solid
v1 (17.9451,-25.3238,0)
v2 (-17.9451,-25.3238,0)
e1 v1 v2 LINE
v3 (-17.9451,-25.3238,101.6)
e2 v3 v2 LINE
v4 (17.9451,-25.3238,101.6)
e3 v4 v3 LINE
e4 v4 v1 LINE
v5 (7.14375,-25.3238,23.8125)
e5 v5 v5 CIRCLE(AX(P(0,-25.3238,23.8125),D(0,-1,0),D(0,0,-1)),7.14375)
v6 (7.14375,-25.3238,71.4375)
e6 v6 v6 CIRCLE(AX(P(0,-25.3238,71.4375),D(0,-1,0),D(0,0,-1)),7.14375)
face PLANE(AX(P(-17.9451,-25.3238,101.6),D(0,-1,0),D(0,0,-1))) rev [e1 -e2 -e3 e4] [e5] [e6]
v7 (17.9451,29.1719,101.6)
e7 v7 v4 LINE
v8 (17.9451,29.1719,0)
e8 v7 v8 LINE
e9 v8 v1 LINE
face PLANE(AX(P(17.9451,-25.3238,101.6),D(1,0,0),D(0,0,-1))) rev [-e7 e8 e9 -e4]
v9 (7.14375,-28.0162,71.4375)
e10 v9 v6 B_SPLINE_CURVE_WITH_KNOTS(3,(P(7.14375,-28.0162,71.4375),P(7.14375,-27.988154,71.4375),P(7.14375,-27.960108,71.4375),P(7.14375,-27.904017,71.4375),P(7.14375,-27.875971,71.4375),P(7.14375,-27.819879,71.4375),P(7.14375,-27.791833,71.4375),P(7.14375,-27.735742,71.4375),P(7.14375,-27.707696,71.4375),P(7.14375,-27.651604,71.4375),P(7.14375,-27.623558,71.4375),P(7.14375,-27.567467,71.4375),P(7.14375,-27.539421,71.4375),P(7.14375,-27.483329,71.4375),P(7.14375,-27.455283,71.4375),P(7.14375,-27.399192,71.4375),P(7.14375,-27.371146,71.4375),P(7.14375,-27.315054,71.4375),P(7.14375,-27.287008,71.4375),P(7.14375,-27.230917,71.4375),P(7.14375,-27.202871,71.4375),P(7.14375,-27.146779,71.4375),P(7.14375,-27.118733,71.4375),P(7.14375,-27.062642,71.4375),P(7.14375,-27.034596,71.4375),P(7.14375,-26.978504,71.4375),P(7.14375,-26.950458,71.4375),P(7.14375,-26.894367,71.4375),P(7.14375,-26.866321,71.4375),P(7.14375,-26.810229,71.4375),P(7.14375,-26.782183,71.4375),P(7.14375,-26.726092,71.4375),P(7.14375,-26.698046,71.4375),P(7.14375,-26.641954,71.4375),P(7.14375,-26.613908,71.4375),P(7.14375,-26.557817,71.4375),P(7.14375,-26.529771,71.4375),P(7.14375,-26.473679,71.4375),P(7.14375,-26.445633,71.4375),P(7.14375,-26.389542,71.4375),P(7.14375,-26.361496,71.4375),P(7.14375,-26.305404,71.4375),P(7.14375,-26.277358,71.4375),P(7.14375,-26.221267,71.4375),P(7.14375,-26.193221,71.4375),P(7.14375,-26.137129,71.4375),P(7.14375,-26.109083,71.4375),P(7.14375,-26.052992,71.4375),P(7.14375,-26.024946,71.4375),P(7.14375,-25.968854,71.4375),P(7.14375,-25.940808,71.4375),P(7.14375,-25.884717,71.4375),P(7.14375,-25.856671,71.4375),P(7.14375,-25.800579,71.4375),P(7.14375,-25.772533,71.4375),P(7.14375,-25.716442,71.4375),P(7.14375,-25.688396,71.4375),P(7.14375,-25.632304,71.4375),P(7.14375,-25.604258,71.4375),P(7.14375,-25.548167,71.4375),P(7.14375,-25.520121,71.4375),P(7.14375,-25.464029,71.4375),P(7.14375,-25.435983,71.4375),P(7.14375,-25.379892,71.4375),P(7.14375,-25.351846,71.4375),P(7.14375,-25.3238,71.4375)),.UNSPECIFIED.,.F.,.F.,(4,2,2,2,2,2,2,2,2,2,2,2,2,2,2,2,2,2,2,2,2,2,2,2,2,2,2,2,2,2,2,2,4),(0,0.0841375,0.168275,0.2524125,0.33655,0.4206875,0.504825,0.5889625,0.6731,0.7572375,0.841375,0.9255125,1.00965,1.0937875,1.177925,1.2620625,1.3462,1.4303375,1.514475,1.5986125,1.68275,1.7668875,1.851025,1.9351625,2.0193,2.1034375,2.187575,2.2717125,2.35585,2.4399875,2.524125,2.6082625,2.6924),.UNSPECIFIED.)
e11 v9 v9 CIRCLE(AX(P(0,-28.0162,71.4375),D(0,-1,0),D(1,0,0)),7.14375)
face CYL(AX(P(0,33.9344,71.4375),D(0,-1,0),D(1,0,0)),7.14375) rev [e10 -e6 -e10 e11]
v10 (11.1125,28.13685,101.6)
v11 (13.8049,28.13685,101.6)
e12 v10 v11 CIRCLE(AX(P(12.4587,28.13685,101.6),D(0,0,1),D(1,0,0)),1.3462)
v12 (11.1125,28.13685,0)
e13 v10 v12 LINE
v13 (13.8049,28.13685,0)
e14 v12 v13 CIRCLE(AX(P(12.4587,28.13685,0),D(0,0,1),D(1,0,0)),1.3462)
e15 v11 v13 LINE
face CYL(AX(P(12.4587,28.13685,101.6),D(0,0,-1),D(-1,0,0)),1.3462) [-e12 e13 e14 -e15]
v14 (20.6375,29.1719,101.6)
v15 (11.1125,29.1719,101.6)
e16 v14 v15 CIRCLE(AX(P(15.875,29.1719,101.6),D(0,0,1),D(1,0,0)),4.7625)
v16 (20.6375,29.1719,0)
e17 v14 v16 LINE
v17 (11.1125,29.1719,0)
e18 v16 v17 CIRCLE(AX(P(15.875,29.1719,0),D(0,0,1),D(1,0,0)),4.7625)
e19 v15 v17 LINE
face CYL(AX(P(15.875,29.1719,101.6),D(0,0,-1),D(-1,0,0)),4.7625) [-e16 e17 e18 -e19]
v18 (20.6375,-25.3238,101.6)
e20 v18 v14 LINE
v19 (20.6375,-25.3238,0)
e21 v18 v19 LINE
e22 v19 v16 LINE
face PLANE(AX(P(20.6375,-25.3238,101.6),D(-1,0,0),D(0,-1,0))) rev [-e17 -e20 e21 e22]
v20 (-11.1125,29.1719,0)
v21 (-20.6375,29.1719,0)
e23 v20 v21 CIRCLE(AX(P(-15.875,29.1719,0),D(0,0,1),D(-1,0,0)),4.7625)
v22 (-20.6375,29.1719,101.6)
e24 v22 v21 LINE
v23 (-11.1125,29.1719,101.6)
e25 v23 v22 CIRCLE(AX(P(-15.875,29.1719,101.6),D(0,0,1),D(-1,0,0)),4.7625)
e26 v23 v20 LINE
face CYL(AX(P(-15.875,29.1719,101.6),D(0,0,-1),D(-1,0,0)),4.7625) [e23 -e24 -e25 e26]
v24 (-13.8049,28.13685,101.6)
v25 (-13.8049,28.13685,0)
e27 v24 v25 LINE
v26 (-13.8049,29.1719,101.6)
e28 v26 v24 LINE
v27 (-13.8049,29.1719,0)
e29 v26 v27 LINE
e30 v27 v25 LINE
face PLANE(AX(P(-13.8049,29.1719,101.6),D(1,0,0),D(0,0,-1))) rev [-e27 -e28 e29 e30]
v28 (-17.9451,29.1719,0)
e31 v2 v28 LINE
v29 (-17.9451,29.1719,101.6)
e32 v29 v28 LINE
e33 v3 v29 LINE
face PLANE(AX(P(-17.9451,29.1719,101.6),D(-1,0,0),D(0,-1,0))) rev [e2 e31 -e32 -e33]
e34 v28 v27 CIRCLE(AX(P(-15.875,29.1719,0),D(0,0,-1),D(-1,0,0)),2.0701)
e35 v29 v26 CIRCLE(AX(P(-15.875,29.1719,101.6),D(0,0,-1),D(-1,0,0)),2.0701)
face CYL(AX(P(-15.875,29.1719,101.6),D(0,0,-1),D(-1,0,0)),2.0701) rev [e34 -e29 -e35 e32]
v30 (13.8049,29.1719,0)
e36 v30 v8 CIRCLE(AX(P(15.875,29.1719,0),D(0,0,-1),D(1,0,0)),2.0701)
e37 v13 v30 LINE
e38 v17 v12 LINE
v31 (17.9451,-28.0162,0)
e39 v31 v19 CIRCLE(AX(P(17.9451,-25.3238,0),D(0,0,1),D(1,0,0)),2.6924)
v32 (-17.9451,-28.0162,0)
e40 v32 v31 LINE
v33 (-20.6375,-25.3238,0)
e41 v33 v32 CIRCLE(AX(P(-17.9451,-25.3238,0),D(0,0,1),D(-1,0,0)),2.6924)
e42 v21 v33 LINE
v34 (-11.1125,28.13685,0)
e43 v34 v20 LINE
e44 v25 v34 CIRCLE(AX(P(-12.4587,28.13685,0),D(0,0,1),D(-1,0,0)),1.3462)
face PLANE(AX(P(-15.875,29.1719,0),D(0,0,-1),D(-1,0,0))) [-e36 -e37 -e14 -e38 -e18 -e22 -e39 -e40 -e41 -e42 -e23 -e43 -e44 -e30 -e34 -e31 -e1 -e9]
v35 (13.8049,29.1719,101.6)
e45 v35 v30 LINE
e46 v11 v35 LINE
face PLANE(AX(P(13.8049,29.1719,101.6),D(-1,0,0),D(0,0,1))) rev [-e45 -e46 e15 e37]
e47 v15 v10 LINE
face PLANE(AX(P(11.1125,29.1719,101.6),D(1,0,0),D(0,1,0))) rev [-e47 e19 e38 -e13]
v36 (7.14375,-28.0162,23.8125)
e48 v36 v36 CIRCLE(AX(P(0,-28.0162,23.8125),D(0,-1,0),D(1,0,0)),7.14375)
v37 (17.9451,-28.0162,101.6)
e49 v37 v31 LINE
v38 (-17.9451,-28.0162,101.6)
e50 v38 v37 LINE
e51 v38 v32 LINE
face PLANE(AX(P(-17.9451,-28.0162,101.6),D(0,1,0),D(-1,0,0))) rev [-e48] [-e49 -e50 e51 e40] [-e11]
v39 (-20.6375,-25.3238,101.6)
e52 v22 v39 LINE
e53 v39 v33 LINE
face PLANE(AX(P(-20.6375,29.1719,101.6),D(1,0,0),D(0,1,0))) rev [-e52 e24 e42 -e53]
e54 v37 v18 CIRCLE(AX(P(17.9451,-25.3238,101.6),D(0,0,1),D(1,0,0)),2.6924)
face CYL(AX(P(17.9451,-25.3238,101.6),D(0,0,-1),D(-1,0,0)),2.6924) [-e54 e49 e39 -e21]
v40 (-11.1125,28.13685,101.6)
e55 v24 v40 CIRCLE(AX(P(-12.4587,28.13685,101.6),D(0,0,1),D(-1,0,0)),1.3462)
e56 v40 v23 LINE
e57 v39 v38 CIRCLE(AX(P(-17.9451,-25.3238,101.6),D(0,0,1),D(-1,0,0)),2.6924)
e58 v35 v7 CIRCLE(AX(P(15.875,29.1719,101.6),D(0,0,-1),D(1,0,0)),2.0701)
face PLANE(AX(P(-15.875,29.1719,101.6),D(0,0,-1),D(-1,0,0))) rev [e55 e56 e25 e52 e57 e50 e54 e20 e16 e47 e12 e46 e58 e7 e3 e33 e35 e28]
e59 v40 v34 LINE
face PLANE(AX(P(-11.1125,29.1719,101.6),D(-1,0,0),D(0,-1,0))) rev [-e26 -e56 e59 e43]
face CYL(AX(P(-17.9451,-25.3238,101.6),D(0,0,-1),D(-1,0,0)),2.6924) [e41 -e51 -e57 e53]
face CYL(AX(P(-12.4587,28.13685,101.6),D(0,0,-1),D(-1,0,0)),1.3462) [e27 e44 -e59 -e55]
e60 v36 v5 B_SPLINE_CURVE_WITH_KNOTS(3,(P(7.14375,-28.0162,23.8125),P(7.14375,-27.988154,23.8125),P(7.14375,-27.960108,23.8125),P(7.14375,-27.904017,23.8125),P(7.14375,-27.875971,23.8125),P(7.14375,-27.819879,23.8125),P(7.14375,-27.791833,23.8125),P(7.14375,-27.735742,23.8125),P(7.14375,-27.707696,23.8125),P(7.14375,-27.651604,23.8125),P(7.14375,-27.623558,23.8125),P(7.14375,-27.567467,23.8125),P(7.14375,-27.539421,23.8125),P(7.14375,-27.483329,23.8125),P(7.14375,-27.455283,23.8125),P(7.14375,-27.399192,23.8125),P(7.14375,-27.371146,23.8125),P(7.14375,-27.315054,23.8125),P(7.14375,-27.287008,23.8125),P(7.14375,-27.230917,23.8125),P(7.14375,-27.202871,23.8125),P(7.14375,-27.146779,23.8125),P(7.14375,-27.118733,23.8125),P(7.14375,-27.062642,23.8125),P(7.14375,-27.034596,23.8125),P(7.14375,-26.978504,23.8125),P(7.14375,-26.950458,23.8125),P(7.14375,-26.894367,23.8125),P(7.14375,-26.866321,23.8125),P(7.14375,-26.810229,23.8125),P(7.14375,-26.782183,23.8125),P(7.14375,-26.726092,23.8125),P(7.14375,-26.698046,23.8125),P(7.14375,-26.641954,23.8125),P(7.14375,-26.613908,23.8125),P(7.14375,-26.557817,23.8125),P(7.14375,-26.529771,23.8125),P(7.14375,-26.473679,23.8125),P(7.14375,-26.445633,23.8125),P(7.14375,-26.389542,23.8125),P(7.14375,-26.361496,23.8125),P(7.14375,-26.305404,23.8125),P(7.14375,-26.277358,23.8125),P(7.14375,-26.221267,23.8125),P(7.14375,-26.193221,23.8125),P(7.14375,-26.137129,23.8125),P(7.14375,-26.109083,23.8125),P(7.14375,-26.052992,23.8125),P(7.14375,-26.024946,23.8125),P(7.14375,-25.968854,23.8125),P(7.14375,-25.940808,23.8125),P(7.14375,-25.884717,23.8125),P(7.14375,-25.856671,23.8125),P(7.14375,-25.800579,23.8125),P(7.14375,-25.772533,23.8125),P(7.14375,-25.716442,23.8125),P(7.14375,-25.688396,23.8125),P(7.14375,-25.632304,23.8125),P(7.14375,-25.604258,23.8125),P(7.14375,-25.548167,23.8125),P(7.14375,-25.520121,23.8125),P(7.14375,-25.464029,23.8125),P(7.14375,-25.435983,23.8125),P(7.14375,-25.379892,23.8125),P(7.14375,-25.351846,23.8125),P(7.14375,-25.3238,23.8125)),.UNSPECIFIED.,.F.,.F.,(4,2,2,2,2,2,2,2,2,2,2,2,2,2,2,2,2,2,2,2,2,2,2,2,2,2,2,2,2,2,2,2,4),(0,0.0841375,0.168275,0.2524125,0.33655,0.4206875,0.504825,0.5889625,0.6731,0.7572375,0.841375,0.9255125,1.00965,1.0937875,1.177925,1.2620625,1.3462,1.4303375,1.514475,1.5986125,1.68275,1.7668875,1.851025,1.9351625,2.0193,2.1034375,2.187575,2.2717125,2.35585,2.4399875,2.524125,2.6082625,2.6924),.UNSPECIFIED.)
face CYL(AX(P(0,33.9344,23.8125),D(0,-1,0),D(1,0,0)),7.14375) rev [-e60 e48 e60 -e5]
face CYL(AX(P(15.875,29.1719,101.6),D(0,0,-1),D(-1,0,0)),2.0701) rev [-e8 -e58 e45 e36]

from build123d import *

# Parameters (mm, degrees)
BASE_EXTRUDE_DEPTH = 101.6
HOLE1_START        = -28.0162
HOLE1_OUTLINE_R    = 7.14375
HOLE1_DEPTH        = 2.6924
LPATTERN2_COUNT    = 2
LPATTERN2_PITCH    = 47.625


# Read off the part's stored shape, not the designer's step: Hole1
with BuildPart() as part:
    # Sketch1 → Base-Extrude (new body)
    with BuildSketch(Plane.XY):
        with BuildLine():
            Line((-20.6375, 29.1719), (-20.6375, -25.3238))
            ThreePointArc((-20.6375, -25.3238), (-19.848914298, -27.227614298), (-17.9451, -28.0162))
            Line((-17.9451, -28.0162), (17.9451, -28.0162))
            ThreePointArc((17.9451, -28.0162), (19.848914298, -27.227614298), (20.6375, -25.3238))
            Line((20.6375, -25.3238), (20.6375, 29.1719))
            ThreePointArc((20.6375, 29.1719), (15.875, 33.9344), (11.1125, 29.1719))
            Line((11.1125, 29.1719), (11.1125, 28.13685))
            ThreePointArc((11.1125, 28.13685), (12.4587, 26.79065), (13.8049, 28.13685))
            Line((13.8049, 28.13685), (13.8049, 29.1719))
            ThreePointArc((13.8049, 29.1719), (15.875, 31.242), (17.9451, 29.1719))
            Line((17.9451, 29.1719), (17.9451, -25.3238))
            Line((17.9451, -25.3238), (-17.9451, -25.3238))
            Line((-17.9451, -25.3238), (-17.9451, 29.1719))
            ThreePointArc((-17.9451, 29.1719), (-15.875, 31.242), (-13.8049, 29.1719))
            Line((-13.8049, 29.1719), (-13.8049, 28.13685))
            ThreePointArc((-13.8049, 28.13685), (-12.4587, 26.79065), (-11.1125, 28.13685))
            Line((-11.1125, 28.13685), (-11.1125, 29.1719))
            ThreePointArc((-11.1125, 29.1719), (-15.875, 33.9344), (-20.6375, 29.1719))
        make_face()
    extrude(amount=BASE_EXTRUDE_DEPTH)

    # Hole1 outline → Hole1 (cut)
    with BuildSketch(Plane(origin=(0, 0, 0), x_dir=(1, 0, 0), z_dir=(0, 1, 0)).offset(HOLE1_START)):
        with Locations((0, -23.8125)):
            Circle(HOLE1_OUTLINE_R)
    hole1 = extrude(amount=HOLE1_DEPTH, mode=Mode.SUBTRACT)

    # LPattern2: Hole1 ×2
    with Locations(*[(0, 0, i * LPATTERN2_PITCH) for i in range(1, LPATTERN2_COUNT)]):
        add(hole1, mode=Mode.SUBTRACT)


solid = part.part
